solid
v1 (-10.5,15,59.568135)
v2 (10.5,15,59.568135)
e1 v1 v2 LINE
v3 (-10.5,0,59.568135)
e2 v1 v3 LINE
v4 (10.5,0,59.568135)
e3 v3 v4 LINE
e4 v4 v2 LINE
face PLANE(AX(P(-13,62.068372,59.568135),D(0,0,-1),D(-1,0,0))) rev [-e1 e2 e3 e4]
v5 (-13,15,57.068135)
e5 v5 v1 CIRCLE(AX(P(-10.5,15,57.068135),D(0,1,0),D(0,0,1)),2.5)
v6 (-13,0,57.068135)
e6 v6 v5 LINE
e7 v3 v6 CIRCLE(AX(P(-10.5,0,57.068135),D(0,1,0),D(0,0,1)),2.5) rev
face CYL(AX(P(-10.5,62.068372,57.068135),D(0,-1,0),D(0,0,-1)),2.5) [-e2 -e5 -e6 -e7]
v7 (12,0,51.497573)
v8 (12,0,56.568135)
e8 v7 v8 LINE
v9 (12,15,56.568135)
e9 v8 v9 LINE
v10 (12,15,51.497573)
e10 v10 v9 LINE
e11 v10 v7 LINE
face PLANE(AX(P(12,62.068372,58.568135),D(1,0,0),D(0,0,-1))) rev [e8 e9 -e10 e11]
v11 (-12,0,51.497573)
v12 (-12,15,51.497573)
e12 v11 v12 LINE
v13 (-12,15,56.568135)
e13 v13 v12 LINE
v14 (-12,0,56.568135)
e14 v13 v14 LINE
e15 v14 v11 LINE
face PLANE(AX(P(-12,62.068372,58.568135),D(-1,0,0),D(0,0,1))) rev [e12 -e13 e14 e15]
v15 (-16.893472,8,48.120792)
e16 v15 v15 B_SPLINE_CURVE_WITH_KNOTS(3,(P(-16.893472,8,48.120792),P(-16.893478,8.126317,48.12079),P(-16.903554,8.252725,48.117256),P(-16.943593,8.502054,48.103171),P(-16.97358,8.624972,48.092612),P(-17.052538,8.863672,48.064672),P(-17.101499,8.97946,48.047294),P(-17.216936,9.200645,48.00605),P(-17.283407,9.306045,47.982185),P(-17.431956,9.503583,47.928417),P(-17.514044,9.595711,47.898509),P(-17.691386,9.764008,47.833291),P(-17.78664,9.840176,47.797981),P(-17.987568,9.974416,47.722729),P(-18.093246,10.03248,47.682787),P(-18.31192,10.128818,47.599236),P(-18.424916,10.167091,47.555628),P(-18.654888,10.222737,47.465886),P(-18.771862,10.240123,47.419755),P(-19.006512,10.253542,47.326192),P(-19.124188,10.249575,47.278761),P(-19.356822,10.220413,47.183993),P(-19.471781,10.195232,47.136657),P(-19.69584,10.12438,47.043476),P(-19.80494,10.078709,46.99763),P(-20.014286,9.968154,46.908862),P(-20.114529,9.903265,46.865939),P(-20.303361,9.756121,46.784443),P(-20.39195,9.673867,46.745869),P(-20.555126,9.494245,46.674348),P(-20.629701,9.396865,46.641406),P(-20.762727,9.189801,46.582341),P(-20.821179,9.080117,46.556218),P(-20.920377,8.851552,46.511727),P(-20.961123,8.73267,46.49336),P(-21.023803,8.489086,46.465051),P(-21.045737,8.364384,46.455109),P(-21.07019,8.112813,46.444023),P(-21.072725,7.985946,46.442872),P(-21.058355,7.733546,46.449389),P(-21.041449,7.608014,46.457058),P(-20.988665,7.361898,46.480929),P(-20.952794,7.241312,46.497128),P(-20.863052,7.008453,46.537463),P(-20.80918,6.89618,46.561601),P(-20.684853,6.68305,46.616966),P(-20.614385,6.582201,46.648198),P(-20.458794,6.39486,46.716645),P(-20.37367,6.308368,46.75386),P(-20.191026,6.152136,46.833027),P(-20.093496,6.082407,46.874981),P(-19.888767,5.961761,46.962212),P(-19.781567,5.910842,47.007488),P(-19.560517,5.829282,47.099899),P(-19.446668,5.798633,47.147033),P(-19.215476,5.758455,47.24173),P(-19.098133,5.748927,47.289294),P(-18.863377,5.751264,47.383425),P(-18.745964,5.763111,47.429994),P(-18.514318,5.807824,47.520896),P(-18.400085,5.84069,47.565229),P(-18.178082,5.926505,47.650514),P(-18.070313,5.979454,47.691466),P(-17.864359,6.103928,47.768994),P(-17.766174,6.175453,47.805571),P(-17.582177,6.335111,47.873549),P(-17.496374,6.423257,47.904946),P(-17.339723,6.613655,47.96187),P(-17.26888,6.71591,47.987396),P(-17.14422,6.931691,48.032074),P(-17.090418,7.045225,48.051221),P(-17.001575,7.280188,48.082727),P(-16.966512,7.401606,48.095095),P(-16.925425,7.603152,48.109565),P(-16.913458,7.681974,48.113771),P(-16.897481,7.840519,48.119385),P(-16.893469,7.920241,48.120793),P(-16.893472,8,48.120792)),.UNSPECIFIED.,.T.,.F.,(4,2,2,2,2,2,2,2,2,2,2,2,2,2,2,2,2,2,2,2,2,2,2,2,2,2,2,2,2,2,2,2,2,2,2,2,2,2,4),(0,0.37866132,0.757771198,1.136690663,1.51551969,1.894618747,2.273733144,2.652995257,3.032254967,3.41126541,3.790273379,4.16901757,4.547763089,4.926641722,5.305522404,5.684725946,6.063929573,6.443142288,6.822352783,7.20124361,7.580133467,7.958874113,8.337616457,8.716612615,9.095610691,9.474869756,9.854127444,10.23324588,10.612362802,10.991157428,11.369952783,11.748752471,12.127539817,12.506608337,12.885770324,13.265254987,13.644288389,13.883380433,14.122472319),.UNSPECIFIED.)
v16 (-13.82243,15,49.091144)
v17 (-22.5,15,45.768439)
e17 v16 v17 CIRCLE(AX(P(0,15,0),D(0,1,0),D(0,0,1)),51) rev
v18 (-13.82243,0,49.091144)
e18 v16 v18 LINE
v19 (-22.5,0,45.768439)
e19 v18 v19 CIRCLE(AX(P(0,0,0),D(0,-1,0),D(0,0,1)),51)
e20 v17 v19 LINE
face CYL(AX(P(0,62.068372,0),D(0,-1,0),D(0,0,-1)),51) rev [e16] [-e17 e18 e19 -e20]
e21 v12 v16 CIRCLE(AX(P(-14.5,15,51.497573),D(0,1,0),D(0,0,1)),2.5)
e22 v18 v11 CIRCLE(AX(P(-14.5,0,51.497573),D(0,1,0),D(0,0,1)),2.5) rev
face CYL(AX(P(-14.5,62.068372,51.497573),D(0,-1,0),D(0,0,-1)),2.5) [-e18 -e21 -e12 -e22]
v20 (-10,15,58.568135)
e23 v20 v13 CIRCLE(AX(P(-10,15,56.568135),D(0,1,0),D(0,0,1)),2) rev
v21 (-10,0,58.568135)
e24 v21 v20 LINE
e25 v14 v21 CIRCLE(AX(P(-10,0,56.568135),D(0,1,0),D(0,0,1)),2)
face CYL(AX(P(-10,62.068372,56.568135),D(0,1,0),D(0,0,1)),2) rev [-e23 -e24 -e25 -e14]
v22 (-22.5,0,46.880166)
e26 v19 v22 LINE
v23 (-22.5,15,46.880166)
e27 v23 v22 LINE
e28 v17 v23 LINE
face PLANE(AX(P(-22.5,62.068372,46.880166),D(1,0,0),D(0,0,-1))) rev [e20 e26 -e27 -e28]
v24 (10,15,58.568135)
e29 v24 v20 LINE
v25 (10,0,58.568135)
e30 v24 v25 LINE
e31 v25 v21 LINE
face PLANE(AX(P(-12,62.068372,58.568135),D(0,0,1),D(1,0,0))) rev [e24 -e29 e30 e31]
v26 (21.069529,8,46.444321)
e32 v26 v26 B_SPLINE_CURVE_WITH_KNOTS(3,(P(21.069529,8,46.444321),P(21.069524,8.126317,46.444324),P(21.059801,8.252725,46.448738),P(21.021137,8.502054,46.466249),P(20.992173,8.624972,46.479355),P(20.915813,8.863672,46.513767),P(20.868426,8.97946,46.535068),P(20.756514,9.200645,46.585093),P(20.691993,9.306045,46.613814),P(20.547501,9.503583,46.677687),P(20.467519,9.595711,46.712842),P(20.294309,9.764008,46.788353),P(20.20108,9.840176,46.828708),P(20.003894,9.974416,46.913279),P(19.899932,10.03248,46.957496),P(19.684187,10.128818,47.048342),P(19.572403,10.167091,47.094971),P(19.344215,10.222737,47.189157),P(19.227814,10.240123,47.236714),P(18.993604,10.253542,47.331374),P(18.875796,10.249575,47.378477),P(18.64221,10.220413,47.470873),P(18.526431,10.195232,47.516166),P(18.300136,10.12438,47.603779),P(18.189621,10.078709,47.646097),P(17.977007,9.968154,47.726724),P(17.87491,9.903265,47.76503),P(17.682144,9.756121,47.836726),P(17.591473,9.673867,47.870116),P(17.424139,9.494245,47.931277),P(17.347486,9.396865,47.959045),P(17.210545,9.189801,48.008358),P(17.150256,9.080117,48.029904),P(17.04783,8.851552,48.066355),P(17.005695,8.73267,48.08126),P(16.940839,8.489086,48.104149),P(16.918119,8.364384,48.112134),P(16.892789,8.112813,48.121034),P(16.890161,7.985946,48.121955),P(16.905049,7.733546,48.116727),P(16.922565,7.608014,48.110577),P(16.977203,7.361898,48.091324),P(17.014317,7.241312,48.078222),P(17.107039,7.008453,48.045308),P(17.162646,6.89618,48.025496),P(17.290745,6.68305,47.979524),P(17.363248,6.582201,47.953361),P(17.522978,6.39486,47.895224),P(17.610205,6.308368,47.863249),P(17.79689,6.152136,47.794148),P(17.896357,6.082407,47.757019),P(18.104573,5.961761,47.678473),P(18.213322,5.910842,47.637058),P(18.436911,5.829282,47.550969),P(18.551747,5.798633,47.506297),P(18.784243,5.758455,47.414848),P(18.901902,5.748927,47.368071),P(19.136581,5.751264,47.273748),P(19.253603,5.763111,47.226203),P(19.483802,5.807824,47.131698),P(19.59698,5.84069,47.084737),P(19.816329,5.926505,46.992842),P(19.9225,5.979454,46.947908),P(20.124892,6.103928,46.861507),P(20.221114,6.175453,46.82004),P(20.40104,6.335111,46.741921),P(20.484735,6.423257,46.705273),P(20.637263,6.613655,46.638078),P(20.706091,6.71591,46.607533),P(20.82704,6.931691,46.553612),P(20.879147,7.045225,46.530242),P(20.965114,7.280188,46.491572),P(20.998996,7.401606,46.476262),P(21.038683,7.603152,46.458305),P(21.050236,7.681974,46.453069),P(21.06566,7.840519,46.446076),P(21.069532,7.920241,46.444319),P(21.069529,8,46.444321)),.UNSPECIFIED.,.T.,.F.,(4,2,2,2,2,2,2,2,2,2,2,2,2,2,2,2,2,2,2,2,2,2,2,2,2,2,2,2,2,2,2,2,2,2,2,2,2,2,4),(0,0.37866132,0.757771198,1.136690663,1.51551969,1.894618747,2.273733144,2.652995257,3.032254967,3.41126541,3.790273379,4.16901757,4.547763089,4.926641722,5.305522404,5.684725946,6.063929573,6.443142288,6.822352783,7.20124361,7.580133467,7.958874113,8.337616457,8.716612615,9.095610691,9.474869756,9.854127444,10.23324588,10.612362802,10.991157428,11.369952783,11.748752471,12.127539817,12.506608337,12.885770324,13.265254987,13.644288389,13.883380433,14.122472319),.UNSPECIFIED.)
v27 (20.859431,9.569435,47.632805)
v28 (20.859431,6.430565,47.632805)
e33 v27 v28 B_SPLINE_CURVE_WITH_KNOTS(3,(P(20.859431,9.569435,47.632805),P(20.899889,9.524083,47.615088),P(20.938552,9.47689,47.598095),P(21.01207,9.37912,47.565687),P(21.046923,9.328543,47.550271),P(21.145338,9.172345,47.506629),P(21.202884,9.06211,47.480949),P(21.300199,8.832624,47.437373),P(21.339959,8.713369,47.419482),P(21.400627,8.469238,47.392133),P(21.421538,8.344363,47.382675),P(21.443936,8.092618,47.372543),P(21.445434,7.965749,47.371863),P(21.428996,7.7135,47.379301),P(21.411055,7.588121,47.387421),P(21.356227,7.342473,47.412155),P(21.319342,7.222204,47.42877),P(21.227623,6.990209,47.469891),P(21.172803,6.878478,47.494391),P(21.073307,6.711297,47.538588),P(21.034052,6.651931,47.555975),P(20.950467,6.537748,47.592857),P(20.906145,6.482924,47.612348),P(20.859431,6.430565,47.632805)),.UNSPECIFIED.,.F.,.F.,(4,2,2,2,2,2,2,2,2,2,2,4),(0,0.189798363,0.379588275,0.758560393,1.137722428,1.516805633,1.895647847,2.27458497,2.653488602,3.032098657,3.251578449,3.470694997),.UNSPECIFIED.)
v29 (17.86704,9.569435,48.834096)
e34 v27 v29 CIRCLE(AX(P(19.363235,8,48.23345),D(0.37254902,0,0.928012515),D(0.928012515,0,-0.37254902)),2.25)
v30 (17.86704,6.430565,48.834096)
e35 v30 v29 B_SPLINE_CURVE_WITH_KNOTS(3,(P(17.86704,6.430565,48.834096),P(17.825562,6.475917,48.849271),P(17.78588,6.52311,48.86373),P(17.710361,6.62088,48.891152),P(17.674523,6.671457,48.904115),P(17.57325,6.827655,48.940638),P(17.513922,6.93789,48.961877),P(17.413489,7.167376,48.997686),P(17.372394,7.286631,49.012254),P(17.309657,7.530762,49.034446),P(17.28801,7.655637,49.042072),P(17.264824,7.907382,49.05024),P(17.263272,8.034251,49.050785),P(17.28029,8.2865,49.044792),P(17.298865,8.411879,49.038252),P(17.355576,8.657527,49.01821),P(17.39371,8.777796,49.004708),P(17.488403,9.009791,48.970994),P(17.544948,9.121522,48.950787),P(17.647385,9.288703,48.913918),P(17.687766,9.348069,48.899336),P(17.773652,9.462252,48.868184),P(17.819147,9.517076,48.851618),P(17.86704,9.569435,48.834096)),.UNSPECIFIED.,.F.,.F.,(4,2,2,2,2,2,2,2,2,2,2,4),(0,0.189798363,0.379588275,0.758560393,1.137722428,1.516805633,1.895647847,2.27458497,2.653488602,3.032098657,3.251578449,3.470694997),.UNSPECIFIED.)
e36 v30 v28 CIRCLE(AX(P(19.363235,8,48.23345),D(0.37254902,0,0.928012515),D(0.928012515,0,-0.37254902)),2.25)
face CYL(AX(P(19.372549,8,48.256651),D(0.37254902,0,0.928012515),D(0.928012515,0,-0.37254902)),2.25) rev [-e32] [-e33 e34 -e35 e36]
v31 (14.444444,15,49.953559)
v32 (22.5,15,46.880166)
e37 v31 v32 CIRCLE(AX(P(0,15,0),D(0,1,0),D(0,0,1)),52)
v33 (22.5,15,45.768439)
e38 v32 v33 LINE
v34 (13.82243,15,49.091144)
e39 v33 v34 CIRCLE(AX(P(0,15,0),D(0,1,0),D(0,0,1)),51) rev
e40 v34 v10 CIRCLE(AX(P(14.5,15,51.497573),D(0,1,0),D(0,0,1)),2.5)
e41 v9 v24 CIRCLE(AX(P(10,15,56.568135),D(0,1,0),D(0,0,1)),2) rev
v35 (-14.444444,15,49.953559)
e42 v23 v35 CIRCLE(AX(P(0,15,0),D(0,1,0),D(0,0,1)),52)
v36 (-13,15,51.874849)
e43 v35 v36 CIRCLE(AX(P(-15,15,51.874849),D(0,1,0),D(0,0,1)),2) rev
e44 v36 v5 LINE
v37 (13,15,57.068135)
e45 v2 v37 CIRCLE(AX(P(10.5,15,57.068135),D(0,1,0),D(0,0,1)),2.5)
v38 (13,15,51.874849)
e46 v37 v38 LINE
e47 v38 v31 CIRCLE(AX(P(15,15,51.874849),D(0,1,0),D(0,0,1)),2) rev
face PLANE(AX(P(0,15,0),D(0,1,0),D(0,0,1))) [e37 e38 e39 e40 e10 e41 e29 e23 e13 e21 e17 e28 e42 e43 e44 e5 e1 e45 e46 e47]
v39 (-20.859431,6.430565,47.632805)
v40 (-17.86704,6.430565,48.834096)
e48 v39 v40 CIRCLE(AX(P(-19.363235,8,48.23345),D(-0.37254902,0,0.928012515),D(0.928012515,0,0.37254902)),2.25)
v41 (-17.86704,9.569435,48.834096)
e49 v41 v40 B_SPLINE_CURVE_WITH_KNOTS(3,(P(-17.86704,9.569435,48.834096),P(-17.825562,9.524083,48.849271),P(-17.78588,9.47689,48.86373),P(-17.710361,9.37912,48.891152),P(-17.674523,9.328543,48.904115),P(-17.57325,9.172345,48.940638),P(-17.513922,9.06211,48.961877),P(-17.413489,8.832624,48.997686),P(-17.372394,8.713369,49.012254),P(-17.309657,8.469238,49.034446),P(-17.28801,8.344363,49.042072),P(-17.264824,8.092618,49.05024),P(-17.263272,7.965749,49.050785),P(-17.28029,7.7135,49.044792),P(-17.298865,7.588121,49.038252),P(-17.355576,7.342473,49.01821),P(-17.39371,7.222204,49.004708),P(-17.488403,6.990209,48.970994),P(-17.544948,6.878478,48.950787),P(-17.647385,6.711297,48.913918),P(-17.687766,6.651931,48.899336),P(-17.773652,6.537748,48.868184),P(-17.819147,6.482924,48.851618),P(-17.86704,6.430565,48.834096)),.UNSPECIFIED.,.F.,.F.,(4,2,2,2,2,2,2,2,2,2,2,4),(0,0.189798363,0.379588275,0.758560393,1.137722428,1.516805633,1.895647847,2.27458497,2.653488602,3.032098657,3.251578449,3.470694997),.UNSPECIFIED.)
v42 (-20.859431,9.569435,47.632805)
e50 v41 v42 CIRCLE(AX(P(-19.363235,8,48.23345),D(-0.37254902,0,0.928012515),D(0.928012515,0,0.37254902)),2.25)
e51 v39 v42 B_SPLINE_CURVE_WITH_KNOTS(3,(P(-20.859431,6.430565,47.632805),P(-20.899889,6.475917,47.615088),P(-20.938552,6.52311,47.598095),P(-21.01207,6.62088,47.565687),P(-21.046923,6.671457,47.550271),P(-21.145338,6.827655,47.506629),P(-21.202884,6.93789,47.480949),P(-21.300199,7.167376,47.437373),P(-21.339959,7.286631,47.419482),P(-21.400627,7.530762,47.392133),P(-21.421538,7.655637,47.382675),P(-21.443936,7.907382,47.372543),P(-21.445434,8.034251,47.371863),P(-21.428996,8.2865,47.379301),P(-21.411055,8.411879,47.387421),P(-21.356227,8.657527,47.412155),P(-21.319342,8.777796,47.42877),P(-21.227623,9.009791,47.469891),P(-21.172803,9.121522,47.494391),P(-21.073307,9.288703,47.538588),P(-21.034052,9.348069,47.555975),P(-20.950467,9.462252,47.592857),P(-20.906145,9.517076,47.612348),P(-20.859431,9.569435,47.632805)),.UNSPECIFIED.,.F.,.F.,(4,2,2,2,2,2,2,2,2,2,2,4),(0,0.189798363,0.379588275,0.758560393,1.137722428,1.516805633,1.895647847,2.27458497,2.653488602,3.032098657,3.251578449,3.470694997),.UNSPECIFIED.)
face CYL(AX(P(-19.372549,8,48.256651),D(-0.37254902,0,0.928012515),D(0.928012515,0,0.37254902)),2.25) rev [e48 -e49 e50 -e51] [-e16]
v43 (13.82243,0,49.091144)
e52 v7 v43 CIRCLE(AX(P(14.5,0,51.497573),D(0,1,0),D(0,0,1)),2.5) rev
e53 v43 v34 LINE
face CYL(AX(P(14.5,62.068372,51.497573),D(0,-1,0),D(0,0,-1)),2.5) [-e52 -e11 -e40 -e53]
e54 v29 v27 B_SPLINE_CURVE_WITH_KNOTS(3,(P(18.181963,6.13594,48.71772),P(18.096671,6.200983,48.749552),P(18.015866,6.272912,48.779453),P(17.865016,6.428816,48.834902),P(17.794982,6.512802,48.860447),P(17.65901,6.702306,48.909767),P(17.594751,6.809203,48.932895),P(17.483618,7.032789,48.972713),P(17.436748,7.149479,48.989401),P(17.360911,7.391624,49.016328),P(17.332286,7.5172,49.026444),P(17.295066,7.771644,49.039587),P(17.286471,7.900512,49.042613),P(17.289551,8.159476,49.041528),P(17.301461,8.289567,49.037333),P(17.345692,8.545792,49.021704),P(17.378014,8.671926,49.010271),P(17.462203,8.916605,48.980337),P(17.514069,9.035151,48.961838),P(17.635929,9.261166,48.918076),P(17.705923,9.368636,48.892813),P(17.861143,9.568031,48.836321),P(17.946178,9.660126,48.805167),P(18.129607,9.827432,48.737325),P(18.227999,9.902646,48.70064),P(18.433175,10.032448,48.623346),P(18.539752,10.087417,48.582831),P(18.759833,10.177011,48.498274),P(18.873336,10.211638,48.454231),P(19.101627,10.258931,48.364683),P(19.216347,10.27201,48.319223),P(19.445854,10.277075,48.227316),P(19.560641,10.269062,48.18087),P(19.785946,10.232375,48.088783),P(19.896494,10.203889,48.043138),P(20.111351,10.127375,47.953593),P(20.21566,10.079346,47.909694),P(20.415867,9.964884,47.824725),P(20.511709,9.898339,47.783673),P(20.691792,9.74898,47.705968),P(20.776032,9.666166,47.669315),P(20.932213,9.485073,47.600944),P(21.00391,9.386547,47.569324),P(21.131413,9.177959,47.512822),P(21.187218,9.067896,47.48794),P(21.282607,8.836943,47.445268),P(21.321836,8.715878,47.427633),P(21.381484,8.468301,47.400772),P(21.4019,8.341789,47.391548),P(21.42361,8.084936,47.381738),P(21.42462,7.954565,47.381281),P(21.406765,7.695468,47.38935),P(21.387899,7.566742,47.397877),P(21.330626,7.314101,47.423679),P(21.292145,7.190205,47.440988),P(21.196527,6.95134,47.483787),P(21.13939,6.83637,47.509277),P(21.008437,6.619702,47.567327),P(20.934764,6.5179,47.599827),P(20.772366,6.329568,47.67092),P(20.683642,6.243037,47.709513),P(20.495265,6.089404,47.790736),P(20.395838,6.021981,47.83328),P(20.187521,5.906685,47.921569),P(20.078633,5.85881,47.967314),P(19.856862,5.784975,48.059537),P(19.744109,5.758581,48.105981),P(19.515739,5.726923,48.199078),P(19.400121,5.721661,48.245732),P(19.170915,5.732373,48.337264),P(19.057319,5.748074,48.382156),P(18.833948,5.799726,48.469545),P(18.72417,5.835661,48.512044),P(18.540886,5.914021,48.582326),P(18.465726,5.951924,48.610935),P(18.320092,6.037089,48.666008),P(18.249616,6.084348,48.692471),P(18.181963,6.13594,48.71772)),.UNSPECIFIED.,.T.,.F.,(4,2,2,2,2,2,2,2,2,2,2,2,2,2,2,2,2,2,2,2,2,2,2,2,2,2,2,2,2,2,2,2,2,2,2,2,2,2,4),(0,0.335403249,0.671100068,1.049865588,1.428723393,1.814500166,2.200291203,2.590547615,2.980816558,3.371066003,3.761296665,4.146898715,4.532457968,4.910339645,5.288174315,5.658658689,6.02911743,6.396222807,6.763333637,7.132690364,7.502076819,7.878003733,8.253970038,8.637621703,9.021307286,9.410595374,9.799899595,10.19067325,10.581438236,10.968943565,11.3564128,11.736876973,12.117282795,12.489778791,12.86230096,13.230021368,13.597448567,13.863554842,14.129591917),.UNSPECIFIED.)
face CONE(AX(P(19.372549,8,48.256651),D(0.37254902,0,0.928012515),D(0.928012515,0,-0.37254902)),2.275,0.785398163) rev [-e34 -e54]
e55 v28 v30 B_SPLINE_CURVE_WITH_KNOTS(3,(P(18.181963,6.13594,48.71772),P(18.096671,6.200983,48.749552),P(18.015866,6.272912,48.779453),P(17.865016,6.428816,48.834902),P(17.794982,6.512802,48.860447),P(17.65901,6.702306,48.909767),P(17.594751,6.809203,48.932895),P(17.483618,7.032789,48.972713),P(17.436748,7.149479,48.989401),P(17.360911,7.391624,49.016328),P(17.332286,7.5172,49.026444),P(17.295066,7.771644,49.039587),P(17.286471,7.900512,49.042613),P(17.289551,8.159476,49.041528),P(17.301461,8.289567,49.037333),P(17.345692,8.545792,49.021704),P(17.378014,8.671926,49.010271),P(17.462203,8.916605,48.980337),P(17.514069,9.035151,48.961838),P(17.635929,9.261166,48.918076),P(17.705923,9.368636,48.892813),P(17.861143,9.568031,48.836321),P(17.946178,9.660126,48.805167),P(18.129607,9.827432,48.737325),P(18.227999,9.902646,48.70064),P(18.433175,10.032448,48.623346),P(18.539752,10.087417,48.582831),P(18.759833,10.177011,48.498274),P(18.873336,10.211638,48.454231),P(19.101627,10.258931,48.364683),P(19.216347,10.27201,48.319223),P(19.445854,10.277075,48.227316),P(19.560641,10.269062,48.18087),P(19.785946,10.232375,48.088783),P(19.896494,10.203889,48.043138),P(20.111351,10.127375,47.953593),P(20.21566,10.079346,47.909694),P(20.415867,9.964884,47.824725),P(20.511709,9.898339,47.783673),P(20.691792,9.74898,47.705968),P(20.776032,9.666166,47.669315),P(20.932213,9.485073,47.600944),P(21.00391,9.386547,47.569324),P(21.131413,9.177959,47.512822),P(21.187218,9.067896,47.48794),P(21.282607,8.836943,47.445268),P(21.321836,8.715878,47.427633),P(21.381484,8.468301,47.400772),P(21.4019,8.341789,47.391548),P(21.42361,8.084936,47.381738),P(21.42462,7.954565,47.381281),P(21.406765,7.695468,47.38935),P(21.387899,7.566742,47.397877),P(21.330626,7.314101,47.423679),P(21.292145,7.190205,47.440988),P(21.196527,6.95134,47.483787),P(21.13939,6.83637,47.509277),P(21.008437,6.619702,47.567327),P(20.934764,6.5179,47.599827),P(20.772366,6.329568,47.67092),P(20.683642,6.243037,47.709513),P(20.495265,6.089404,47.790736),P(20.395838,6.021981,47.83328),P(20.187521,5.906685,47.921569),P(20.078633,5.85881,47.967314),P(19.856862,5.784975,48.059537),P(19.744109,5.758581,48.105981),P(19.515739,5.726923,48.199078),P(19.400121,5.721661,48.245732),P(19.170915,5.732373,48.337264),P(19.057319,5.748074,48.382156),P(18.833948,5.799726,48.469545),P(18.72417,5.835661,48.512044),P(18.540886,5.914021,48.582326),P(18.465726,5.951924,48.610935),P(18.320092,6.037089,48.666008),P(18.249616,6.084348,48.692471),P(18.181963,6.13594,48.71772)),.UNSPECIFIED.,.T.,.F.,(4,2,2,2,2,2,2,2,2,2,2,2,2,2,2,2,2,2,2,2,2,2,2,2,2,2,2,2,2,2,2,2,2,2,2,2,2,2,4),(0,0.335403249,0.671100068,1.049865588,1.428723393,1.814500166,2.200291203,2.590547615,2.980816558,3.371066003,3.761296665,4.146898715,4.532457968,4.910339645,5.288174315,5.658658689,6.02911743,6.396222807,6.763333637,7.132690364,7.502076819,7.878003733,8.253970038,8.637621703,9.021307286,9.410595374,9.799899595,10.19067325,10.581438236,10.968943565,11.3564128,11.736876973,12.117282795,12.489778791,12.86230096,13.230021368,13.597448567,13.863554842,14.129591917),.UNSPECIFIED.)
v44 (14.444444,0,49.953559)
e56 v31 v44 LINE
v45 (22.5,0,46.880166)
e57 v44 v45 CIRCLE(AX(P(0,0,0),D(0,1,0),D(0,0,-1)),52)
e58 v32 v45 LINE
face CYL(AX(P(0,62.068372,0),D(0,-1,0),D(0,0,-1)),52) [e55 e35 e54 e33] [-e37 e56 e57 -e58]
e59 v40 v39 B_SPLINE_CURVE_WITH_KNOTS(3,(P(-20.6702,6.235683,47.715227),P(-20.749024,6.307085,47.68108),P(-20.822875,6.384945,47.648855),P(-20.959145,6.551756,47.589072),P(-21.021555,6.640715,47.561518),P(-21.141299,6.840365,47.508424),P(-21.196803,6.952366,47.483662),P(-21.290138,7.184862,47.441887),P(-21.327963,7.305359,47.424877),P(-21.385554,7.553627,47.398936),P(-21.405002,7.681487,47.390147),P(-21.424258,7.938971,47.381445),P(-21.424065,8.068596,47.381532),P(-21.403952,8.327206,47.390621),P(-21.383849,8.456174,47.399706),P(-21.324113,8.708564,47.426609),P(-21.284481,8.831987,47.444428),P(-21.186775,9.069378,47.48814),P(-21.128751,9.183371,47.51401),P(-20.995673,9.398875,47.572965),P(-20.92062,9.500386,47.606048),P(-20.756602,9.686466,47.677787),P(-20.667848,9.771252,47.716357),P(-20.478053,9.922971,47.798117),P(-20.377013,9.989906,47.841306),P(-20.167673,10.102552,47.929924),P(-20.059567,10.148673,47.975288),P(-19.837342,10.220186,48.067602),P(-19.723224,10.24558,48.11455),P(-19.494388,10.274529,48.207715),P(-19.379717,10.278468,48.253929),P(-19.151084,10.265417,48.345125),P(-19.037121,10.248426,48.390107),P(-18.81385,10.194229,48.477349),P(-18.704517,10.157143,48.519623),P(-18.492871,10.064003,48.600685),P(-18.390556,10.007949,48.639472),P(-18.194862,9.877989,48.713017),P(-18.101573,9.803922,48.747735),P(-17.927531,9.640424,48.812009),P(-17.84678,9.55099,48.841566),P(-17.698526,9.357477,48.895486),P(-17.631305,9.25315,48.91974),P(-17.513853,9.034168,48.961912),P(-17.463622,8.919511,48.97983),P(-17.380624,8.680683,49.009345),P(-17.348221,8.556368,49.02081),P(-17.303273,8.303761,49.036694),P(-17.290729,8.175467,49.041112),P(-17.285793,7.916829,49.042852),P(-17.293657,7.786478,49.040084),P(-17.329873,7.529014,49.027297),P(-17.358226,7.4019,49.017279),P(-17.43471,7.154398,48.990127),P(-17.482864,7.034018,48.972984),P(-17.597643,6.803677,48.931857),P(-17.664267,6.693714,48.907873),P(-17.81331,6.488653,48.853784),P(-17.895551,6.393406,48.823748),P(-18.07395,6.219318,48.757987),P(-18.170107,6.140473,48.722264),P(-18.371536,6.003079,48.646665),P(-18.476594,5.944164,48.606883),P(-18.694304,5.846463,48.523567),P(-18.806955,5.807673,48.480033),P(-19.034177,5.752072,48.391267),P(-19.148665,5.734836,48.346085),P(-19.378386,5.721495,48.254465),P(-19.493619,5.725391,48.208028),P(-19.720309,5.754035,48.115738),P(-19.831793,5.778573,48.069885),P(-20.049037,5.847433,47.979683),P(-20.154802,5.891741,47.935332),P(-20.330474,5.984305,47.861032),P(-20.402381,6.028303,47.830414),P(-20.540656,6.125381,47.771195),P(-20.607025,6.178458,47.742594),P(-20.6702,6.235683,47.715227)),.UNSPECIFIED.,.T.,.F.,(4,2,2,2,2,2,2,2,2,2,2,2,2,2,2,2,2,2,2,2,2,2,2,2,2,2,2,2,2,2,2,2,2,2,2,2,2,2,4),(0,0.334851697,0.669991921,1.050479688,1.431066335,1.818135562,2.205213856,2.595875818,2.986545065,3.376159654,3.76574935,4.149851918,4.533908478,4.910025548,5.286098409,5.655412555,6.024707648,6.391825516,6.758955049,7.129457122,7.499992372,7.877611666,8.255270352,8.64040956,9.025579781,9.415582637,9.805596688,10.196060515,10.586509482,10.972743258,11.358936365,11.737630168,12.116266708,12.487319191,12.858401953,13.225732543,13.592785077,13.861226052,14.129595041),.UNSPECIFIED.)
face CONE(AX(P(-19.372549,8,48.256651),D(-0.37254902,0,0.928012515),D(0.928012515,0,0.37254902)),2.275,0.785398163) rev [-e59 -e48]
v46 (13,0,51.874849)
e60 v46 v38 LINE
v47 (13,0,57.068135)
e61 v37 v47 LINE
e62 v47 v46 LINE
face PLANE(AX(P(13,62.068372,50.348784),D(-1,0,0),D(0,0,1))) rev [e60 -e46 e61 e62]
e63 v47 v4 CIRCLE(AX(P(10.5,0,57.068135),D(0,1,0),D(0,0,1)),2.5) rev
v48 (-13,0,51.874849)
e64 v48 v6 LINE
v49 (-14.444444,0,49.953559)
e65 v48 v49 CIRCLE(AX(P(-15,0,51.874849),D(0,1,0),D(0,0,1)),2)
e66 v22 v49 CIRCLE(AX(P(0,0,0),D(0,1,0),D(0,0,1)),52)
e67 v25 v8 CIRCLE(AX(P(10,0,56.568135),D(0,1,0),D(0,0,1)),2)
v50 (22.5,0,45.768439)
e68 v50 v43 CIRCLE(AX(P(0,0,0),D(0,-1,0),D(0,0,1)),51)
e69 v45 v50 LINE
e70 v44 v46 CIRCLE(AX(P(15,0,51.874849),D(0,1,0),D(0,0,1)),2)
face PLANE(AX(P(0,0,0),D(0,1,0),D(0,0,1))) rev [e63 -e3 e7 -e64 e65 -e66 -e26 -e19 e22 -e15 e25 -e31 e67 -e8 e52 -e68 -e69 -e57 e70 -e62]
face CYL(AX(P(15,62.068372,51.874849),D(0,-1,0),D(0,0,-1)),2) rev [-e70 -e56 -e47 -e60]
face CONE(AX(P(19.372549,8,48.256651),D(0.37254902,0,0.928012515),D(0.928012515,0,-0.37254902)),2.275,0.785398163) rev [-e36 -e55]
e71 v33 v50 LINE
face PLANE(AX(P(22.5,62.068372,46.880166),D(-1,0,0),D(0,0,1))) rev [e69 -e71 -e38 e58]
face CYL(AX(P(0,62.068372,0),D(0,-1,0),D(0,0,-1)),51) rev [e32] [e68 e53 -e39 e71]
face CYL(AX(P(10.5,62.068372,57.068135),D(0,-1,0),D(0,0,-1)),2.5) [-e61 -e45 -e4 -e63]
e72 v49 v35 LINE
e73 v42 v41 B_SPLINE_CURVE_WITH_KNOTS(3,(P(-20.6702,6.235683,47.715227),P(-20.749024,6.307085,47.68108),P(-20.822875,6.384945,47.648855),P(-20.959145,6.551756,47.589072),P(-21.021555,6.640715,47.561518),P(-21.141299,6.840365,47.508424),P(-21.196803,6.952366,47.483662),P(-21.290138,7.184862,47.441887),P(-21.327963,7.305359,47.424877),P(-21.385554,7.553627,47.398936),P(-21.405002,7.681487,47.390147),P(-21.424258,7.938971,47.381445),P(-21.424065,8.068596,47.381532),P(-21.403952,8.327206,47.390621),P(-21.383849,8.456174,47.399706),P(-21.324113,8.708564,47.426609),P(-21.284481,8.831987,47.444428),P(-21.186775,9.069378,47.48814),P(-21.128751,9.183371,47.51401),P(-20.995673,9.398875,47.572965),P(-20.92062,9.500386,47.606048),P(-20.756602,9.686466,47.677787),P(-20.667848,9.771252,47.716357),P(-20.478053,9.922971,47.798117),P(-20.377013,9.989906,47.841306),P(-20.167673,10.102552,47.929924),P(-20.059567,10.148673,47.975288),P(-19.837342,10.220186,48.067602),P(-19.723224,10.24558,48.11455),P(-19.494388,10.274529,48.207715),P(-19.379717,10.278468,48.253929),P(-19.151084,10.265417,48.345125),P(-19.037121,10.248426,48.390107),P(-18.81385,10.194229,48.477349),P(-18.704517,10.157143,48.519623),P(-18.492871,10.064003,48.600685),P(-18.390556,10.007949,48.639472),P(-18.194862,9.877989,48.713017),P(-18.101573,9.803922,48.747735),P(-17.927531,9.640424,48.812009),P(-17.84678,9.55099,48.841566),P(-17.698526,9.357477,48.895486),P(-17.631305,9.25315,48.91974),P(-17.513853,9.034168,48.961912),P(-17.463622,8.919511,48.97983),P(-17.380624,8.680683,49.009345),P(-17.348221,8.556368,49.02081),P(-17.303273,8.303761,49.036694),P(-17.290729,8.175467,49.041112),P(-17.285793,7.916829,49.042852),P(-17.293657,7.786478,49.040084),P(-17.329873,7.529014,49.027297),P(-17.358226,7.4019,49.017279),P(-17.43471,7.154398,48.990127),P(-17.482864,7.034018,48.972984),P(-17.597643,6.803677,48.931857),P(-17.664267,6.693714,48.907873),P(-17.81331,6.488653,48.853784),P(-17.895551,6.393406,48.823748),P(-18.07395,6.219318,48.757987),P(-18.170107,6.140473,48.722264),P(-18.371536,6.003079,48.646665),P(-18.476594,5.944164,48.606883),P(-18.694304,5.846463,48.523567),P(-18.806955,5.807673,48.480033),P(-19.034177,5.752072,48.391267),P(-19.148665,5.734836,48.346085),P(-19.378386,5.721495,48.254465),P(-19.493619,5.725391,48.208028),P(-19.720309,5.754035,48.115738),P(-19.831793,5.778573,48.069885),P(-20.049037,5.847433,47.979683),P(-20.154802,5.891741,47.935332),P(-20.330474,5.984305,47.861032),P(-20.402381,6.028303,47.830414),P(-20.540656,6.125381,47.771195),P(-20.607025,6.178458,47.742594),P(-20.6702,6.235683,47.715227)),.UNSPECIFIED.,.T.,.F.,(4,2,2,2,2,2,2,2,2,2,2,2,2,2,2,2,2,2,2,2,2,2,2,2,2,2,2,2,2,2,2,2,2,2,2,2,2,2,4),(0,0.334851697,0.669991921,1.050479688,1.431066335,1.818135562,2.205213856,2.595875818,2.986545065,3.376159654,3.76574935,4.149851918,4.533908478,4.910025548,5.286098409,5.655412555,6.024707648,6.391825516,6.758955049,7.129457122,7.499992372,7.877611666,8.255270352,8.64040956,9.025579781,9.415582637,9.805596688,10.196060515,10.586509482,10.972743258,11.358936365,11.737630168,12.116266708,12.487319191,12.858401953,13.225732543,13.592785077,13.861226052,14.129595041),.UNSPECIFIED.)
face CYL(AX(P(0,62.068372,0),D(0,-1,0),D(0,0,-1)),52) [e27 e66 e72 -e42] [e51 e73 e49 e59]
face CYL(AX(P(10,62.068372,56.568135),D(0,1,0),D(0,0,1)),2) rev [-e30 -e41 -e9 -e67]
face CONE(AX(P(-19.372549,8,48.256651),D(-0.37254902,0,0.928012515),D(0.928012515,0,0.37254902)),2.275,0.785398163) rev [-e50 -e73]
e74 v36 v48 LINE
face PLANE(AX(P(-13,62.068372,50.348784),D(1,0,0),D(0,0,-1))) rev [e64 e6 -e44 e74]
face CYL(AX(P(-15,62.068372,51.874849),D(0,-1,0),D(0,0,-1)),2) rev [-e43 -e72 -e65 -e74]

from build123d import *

# Parameters (mm, degrees)
EXTRUDE_1_DEPTH = 15
FILLET_1_R      = 2
FILLET_2_R      = 2.5


# Read off the part's stored shape, not the designer's step: Отверстие с зазором M41
with BuildPart() as part:
    # Эскиз1 → Бобышка-Вытянуть1 (new body)
    with BuildSketch(Plane(origin=(0, 0, 0), x_dir=(1, 0, 0), z_dir=(0, 1, 0))):
        with BuildLine():
            Line((-22.5, -46.880166382), (-22.5, -45.768438907))
            ThreePointArc((-22.5, -45.768438907), (-17.354305588, -47.956522784), (-12, -49.568134926))
            Line((-12, -49.568134926), (-12, -58.568134926))
            Line((-12, -58.568134926), (12, -58.568134926))
            Line((12, -58.568134926), (12, -49.568134926))
            ThreePointArc((12, -49.568134926), (17.354305588, -47.956522784), (22.5, -45.768438907))
            Line((22.5, -45.768438907), (22.5, -46.880166382))
            ThreePointArc((22.5, -46.880166382), (17.834526239, -48.845979096), (13, -50.348783501))
            Line((13, -50.348783501), (13, -59.568134926))
            Line((13, -59.568134926), (-13, -59.568134926))
            Line((-13, -59.568134926), (-13, -50.348783501))
            ThreePointArc((-13, -50.348783501), (-17.834526239, -48.845979096), (-22.5, -46.880166382))
        make_face()
    extrude(amount=EXTRUDE_1_DEPTH)

    # Скругление1
    fillet_1_edges = [part.edges().sort_by_distance(p)[0] for p in [
        (-13, 7.5, 50.348783501),
        (13, 7.5, 50.348783501),
        (12, 7.5, 58.568134926),
        (-12, 7.5, 58.568134926),
    ]]
    fillet(fillet_1_edges, radius=FILLET_1_R)

    # Скругление2
    fillet_2_edges = [part.edges().sort_by_distance(p)[0] for p in [
        (-12, 7.5, 49.568134926),
        (-13, 7.5, 59.568134926),
        (13, 7.5, 59.568134926),
        (12, 7.5, 49.568134926),
    ]]
    fillet(fillet_2_edges, radius=FILLET_2_R)

    # Отверстие с зазором M41 outline → Отверстие с зазором M41 (revolve, cut)
    with BuildSketch(Plane(origin=(0, 8, 0), x_dir=(0.9280125149960182, 0, -0.37254901960784303), z_dir=(0, -1, 0))):
        Polygon((2.25, 52.000021479), (2.25, 51.975), (2.275021479, 52.000021479), align=None)
        Polygon((2.25, 50.950316764), (2.25, 51.975), (2.25, 52.000021479), (0, 52.000021479), (0, 50.950316764), align=None)
    revolve(axis=Axis((0, 8, 0), (0.37254901960784303, 0, 0.9280125149960182)), mode=Mode.SUBTRACT)

    # Hole Wizard M41 2 outline → Hole Wizard M41 2 (revolve, cut)
    with BuildSketch(Plane(origin=(0, 8, 0), x_dir=(0.9280125149960182, 0, 0.37254901960784303), z_dir=(0, 1, 0))):
        Polygon((2.25, -52.000019282), (2.25, -51.975), (2.25, -50.950316764), (0, -50.950316764), (0, -52.000019282), align=None)
        Polygon((2.275019282, -52.000019282), (2.249998249, -51.974998249), (2.25, -52.000019282), align=None)
    revolve(axis=Axis((0, 8, 0), (0.37254901960784303, 0, -0.9280125149960182)), mode=Mode.SUBTRACT)


solid = part.part
